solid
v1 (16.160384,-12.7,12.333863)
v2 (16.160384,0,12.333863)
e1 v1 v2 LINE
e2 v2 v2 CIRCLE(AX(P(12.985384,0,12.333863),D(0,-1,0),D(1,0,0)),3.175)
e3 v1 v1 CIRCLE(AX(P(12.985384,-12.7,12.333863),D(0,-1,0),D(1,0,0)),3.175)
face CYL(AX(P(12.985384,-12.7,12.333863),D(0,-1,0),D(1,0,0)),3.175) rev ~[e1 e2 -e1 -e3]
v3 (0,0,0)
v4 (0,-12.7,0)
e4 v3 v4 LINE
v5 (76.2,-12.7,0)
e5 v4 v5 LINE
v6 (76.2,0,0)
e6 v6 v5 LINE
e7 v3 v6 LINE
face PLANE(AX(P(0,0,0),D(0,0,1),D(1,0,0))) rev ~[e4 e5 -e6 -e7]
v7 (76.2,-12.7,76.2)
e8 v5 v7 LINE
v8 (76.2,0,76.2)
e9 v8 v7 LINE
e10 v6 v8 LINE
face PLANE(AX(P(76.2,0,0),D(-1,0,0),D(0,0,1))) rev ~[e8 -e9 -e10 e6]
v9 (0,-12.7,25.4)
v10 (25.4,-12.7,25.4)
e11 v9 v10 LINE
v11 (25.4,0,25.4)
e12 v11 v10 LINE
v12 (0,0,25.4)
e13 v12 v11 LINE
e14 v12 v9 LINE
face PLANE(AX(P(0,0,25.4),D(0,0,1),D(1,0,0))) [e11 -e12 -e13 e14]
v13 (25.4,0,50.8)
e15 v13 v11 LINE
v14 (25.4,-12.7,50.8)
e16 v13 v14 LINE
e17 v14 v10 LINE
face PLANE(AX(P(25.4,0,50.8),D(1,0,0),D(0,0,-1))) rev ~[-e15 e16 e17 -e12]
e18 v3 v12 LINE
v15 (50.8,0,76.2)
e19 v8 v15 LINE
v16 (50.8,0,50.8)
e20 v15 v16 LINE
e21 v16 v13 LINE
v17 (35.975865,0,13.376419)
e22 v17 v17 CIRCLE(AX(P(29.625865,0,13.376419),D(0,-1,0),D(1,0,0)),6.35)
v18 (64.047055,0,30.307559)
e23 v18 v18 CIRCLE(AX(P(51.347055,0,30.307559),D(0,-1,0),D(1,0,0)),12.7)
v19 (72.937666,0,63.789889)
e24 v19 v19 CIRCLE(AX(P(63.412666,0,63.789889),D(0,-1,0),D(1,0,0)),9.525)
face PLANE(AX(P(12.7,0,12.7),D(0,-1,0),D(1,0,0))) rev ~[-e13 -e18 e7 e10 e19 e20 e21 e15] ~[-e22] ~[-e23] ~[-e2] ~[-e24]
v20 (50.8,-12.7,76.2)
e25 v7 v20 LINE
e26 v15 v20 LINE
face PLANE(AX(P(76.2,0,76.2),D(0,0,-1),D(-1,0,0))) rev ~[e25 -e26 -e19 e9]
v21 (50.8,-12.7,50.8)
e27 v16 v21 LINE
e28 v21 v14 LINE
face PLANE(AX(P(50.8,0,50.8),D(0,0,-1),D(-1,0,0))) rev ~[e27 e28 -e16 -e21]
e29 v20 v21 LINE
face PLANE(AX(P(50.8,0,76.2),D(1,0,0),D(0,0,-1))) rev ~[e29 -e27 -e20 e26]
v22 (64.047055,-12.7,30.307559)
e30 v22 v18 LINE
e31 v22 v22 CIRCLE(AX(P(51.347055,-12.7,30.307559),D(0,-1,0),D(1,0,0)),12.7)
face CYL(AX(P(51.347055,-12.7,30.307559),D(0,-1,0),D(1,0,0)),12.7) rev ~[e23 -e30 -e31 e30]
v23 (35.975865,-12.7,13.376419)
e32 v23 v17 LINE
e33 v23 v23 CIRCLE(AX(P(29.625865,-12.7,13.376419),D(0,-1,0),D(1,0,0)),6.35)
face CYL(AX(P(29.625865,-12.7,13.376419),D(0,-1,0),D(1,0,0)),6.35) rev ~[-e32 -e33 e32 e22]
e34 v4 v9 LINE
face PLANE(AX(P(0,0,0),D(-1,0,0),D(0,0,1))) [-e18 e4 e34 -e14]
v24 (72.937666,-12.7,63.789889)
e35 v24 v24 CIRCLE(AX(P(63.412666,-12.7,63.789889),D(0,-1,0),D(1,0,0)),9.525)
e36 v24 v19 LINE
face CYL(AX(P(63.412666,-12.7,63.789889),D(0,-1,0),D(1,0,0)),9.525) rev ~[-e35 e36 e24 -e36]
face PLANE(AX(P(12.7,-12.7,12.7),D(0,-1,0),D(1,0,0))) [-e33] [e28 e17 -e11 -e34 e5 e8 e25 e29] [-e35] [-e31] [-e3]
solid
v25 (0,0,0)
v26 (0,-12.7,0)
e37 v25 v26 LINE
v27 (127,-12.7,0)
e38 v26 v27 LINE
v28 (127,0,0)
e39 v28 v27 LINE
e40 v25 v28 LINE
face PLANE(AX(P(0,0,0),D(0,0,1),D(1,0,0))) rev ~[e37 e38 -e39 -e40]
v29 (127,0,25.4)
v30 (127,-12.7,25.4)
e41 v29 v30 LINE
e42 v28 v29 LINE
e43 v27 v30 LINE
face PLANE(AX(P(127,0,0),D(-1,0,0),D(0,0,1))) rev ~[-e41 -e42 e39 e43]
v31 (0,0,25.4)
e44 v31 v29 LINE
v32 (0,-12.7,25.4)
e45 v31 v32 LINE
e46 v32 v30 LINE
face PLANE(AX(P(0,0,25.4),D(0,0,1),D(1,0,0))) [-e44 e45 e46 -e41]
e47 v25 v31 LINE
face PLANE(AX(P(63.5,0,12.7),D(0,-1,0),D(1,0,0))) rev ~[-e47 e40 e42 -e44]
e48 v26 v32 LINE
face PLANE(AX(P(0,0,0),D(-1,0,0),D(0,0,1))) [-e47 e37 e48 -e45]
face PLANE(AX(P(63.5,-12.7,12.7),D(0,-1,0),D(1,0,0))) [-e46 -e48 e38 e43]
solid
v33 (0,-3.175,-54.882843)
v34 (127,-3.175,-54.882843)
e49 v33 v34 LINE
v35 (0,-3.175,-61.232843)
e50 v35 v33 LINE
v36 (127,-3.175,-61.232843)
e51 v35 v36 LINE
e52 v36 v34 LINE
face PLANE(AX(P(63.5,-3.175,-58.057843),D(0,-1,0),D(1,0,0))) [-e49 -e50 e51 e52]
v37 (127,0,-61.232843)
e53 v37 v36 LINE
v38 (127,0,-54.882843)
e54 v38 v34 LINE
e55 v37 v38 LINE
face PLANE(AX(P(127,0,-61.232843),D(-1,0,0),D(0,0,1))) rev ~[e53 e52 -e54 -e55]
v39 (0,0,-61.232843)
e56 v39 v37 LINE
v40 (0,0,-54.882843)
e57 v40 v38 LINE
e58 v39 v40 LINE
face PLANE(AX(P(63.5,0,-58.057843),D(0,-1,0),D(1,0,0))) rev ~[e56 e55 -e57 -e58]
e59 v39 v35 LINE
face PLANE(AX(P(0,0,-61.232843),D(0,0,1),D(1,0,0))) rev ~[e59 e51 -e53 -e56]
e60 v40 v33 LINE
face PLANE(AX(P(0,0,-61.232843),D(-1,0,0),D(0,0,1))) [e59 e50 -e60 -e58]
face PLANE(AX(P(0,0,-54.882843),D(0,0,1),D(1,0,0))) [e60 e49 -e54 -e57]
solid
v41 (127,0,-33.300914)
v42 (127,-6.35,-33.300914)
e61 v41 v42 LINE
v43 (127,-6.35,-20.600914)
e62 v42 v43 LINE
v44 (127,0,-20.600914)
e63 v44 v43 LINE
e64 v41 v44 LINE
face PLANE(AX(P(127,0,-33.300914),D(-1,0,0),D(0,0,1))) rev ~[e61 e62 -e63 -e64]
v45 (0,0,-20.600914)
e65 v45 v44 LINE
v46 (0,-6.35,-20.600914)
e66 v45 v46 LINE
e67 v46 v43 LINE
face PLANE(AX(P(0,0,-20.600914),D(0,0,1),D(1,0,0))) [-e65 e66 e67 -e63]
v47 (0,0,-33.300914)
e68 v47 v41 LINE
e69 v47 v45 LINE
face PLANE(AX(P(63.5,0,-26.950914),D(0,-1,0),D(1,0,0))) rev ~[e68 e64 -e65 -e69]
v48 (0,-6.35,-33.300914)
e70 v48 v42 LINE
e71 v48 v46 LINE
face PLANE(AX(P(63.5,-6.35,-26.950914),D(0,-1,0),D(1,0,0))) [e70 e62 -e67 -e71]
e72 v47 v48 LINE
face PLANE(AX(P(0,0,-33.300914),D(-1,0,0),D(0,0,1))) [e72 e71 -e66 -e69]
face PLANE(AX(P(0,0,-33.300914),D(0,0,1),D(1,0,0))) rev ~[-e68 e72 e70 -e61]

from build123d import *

# Parameters (mm, degrees)
F0_W     = 25.4
F0_H     = 25.4
F1_DEPTH = 12.7
F2_R     = 3.175
F2_R_2   = 6.35
F2_R_3   = 9.525
F2_R_4   = 12.7
F3_DEPTH = 170.688
F4_W     = 127
F4_H     = 25.4
F5_DEPTH = 12.7
F4_H_2   = 12.7
F6_DEPTH = 6.35
F4_H_3   = 6.35
F7_DEPTH = 3.175


# Not quite as in the source:
# - a feature of the source that left no trace in its solid (it failed there, or was rolled back) is left out


with BuildPart() as f1:
    # F0 (on Front) → F1 (new body)
    with BuildSketch(Plane.XZ):
        with Locations((12.7, 12.7)):
            Rectangle(F0_W, F0_H)
        Polygon((25.4, 25.4), (25.4, 0), (50.8, 0), (50.8, 50.8), (25.4, 50.8), align=None)
        Polygon((50.8, 50.8), (50.8, 0), (76.2, 0), (76.2, 76.2), (50.8, 76.2), align=None)
    extrude(amount=F1_DEPTH)

    # F2 (on face) → F3 (cut)
    with BuildSketch(Plane.XZ.offset(12.7)):
        with Locations((12.9853840917, 12.3338634148)):
            Circle(F2_R)
        with Locations((29.6258646995, 13.3764185011)):
            Circle(F2_R_2)
        with Locations((63.4126663208, 63.7898892164)):
            Circle(F2_R_3)
        with Locations((51.3470545411, 30.3075592965)):
            Circle(F2_R_4)
    extrude(amount=-F3_DEPTH, mode=Mode.SUBTRACT)


with BuildPart() as f5:
    # F4 (on Front) → F5 (new body)
    with BuildSketch(Plane.XZ):
        with Locations((63.5, 12.7)):
            Rectangle(F4_W, F4_H)
    extrude(amount=F5_DEPTH)


with BuildPart() as f6:
    # F4 (on Front) → F6 (new body)
    with BuildSketch(Plane.XZ):
        with Locations((63.5, -26.9509138703)):
            Rectangle(F4_W, F4_H_2)
    extrude(amount=F6_DEPTH)


with BuildPart() as f7:
    # F4 (on Front) → F7 (new body)
    with BuildSketch(Plane.XZ):
        with Locations((63.5, -58.057842505)):
            Rectangle(F4_W, F4_H_3)
    extrude(amount=F7_DEPTH)


solid = Compound([f1.part, f5.part, f6.part, f7.part])
